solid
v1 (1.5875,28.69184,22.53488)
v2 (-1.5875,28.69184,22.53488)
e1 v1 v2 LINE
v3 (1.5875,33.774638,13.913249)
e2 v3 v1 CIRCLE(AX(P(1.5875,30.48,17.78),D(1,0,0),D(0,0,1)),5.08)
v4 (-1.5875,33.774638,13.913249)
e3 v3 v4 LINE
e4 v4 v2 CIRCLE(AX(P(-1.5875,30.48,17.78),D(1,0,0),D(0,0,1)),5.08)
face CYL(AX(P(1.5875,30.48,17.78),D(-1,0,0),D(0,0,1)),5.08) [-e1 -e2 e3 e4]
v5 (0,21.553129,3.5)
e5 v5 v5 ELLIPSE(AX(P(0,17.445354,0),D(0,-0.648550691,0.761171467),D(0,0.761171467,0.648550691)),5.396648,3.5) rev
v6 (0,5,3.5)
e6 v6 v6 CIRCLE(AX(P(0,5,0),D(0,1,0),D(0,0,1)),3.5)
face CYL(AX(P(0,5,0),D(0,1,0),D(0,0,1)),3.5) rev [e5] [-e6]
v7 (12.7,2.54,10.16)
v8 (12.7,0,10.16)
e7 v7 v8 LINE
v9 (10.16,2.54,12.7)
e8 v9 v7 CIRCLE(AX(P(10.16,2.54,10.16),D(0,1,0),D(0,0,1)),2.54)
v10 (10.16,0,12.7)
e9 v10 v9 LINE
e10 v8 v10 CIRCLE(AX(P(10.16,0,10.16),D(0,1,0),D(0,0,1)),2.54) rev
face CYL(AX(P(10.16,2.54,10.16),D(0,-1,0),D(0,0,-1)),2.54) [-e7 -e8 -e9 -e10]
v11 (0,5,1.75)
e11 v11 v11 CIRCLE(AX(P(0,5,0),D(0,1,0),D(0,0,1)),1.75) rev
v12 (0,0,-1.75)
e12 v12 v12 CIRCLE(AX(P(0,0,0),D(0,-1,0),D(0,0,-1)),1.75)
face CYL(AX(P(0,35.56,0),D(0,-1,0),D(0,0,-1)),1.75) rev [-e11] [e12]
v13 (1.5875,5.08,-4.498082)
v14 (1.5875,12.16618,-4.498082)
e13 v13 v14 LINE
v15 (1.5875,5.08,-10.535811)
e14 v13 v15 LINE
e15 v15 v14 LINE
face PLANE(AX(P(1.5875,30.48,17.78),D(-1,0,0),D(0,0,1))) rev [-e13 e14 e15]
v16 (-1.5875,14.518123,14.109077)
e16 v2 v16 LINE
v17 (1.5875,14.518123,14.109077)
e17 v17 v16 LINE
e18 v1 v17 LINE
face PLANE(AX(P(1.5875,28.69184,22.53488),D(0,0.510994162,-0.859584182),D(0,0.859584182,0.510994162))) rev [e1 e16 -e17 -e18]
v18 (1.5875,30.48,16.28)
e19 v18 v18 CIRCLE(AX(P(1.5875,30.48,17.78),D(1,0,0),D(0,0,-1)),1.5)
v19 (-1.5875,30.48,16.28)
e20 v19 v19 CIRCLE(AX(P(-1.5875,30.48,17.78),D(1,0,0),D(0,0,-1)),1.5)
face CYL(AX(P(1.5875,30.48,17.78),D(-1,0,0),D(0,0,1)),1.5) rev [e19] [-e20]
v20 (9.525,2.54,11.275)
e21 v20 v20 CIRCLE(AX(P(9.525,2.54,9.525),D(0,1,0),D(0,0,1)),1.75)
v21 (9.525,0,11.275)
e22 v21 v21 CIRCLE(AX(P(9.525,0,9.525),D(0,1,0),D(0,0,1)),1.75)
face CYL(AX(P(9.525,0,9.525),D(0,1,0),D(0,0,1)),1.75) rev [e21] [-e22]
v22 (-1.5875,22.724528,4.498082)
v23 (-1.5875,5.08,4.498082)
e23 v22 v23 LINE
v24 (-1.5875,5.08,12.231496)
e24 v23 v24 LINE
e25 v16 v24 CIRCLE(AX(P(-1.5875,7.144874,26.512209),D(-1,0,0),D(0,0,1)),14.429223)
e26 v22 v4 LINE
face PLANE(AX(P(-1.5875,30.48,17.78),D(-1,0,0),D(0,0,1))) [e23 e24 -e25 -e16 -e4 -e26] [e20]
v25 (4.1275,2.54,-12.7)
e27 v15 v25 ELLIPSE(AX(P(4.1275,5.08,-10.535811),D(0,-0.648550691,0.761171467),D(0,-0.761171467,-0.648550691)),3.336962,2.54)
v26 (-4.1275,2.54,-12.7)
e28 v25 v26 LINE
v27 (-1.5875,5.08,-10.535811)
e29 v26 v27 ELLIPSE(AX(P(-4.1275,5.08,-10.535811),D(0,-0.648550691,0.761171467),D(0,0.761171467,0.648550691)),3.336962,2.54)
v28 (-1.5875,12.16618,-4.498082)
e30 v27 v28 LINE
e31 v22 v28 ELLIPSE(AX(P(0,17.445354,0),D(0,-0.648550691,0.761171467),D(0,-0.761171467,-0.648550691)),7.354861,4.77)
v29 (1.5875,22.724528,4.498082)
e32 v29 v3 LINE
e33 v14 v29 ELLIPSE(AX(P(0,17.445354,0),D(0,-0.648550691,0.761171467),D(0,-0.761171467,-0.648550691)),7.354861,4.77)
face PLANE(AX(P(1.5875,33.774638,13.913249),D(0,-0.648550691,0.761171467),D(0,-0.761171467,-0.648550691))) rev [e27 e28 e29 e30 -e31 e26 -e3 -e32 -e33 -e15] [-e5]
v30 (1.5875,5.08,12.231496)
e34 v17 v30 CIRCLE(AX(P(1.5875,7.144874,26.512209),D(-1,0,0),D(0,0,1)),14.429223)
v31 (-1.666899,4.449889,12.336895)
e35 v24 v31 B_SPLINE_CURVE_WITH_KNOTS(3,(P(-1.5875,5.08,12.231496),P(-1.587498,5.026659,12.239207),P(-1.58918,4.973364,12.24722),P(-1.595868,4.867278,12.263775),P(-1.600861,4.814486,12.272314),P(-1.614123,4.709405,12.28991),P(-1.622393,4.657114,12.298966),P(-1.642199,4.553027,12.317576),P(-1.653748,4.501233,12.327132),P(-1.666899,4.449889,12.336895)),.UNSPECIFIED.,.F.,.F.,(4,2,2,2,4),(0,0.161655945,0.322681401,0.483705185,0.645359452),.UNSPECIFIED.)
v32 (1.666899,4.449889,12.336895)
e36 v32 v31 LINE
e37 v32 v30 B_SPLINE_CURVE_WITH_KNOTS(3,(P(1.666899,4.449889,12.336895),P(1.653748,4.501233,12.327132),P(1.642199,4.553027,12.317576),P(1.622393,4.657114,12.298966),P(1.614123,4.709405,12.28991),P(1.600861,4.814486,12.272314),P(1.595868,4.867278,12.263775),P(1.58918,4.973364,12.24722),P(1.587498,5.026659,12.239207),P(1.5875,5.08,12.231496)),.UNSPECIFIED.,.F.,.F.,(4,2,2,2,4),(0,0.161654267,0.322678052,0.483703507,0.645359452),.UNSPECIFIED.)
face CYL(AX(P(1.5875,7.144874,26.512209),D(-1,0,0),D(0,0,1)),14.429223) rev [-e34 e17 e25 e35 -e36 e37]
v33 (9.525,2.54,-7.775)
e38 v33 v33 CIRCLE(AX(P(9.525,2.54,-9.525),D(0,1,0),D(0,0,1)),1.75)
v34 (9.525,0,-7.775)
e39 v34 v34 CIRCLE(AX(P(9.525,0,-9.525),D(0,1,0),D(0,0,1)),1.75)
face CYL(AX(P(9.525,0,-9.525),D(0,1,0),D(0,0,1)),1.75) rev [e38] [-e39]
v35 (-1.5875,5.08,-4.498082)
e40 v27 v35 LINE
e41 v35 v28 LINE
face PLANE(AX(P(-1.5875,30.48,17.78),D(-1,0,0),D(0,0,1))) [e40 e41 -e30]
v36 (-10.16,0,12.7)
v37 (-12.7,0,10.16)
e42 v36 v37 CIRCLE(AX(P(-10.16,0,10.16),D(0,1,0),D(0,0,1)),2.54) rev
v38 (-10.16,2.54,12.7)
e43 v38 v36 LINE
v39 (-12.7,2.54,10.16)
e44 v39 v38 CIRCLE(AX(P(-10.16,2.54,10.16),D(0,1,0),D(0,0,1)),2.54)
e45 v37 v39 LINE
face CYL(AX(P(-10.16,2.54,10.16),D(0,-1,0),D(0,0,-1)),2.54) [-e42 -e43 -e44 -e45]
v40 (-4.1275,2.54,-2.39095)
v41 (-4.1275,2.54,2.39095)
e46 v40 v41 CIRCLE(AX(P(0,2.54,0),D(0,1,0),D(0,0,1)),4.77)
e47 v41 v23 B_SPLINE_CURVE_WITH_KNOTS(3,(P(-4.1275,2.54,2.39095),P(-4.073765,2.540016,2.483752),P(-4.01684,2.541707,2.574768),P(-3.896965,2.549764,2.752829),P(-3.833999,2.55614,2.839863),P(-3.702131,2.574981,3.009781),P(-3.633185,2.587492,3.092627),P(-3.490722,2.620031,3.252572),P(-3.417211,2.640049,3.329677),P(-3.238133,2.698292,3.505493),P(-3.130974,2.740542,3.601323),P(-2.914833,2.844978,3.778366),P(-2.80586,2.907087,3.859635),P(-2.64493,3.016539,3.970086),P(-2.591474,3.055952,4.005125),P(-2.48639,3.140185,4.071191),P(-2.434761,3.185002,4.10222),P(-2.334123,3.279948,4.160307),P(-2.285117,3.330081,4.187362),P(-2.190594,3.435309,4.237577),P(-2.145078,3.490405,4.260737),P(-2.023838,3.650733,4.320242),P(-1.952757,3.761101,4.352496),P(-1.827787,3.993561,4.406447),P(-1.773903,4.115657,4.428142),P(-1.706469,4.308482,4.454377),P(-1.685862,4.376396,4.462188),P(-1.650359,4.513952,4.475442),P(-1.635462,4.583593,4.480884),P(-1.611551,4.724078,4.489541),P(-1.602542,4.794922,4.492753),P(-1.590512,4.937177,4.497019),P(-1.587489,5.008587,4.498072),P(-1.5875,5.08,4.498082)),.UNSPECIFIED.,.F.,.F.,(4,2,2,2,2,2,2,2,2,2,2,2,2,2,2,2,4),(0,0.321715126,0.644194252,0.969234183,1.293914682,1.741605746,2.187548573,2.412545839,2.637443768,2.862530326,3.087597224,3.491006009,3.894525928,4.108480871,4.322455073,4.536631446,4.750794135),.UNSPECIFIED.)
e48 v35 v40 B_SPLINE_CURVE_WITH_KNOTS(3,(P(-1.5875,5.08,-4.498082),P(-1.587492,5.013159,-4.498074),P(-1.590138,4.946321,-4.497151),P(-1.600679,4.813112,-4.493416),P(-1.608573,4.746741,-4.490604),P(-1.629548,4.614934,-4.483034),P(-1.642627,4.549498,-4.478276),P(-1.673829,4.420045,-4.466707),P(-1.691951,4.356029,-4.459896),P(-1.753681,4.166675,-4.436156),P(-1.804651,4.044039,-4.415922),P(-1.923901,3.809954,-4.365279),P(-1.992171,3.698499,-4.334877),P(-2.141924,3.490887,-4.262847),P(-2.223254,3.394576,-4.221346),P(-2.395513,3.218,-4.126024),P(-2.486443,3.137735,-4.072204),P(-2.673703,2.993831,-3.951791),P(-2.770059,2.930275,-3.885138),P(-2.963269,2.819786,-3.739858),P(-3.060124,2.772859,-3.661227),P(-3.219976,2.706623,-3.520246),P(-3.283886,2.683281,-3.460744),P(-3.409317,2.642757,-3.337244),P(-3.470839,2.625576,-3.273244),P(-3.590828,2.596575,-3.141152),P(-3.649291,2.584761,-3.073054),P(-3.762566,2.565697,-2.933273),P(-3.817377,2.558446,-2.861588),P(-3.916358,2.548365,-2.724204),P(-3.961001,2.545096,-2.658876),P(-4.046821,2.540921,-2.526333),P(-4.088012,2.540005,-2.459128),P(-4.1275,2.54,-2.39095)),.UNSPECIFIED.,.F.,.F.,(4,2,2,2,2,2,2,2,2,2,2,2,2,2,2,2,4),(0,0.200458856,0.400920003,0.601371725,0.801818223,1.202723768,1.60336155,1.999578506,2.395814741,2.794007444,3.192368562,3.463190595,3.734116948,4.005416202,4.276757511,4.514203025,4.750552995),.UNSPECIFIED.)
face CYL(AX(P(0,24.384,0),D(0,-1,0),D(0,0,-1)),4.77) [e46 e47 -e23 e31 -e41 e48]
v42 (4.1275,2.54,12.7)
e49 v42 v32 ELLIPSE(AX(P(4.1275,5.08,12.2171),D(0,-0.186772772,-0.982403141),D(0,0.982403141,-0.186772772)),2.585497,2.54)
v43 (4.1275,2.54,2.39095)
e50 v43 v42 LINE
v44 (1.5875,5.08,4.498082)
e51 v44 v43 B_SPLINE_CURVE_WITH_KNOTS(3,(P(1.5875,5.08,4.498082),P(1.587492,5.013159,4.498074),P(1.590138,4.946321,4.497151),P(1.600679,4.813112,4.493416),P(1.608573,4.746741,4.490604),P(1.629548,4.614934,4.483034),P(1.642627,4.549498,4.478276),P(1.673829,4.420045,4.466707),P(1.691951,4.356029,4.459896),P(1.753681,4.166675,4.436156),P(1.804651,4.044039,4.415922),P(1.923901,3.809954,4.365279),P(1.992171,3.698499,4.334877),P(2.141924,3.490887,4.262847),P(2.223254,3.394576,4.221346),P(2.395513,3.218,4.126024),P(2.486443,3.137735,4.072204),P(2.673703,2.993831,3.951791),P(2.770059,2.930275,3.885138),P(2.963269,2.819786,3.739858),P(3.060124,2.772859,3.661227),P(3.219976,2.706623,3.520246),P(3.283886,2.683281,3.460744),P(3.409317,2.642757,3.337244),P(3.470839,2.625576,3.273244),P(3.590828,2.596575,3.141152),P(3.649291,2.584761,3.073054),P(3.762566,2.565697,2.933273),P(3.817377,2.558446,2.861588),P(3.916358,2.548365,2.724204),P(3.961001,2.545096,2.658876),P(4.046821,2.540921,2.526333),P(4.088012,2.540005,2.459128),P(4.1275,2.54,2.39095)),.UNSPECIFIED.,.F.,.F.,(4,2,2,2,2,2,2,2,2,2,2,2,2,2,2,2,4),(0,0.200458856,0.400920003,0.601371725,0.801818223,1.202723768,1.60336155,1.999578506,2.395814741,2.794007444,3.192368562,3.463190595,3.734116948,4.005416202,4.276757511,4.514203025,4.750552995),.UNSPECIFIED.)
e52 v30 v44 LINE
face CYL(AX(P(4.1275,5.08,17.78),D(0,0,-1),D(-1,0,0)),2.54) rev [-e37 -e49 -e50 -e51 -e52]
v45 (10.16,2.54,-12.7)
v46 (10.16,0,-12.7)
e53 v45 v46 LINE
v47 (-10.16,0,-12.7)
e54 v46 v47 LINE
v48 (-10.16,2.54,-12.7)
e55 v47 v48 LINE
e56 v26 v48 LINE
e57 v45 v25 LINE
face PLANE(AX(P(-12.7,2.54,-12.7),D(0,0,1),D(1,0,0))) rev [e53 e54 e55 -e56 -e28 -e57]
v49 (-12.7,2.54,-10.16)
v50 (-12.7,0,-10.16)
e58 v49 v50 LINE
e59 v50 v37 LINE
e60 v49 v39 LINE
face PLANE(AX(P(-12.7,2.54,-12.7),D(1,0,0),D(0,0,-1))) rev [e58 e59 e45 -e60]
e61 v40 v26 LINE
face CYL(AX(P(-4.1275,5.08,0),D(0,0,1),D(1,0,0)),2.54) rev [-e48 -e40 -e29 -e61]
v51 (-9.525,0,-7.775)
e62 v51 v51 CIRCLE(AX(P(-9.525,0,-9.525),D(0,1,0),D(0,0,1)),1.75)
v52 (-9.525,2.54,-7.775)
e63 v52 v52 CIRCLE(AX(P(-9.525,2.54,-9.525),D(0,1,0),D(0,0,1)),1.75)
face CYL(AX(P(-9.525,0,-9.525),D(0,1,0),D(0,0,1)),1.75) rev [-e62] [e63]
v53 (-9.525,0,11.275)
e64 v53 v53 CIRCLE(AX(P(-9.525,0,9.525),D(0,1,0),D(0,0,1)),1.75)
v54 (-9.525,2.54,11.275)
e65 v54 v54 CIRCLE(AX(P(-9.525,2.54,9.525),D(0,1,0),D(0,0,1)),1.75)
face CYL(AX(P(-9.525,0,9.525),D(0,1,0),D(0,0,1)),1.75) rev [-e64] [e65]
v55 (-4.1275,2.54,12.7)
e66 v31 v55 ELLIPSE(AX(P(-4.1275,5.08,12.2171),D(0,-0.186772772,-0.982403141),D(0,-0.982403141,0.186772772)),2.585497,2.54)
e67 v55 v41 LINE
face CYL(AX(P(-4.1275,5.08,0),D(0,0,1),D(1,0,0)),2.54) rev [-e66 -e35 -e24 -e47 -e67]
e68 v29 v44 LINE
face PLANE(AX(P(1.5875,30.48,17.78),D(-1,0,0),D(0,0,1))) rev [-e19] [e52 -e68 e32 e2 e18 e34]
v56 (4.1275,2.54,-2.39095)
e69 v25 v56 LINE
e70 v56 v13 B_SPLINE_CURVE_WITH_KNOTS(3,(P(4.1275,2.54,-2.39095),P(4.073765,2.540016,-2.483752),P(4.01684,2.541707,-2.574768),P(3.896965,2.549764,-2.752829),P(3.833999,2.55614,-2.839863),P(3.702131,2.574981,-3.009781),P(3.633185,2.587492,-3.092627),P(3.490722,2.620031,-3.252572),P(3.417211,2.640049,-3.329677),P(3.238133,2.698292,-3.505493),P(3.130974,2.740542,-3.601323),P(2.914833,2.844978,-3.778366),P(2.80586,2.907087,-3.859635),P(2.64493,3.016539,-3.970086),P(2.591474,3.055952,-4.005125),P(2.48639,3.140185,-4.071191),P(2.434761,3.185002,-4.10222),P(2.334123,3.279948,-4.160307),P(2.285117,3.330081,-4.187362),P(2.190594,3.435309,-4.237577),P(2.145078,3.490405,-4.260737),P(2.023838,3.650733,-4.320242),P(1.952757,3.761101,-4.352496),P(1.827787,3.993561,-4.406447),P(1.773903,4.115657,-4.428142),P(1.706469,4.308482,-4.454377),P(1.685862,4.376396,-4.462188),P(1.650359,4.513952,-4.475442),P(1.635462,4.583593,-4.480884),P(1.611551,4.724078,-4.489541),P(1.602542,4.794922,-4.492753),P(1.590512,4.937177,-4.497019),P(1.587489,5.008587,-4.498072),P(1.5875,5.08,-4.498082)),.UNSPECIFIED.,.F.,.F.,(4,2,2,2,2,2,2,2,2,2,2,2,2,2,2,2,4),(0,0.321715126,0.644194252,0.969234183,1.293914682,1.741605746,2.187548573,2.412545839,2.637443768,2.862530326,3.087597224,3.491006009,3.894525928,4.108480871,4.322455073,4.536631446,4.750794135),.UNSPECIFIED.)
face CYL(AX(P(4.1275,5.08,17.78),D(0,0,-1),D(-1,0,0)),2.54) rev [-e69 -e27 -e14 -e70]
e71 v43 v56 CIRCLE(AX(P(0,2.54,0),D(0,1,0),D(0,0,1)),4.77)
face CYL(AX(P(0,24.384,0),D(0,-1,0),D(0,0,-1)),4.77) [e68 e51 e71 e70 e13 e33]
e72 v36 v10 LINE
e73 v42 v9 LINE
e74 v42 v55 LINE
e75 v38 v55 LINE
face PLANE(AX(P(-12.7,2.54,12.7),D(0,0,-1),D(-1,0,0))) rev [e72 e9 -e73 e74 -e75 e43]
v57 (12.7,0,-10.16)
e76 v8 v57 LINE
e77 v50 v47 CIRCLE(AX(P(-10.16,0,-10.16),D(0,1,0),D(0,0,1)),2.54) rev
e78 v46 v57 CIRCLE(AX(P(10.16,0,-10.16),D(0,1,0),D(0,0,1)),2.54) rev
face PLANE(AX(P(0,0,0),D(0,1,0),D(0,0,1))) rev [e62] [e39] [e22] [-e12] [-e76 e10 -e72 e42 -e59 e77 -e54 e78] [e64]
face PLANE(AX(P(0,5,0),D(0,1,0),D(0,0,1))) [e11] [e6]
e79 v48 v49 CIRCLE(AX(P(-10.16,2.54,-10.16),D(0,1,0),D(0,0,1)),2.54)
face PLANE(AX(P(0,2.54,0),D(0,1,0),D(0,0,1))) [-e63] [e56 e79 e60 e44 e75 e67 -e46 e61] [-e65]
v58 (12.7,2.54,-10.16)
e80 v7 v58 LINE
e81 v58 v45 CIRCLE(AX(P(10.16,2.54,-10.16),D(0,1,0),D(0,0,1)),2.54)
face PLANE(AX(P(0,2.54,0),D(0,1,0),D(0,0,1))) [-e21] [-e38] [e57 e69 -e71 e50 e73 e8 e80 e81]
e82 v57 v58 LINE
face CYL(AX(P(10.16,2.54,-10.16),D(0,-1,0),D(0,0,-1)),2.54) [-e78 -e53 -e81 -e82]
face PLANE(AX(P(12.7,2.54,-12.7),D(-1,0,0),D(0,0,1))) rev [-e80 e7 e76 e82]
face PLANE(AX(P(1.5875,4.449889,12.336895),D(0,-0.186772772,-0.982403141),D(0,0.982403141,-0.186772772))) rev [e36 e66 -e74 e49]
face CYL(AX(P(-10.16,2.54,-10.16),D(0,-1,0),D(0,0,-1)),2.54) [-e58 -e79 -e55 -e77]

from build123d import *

# Parameters (mm, degrees)
BOSS_EXTRUDE1_DEPTH     = 2.54
SKETCH3_R               = 1.5000000000000009
BOSS_EXTRUDE2_DEPTH     = 1.5875
FILLET1_START           = -12.7000001
FILLET1_DEPTH           = 25.4000001
FILLET1_START_2         = -5
FILLET1_2_DEPTH         = 10
FILLET2_R               = 2.54
SKETCH4_R               = 3.5
BOSS_EXTRUDE3_DEPTH     = 7
SKETCH5_R               = 1.75
CUT_EXTRUDE1_DEPTH      = 45.14049388033623
CUT_EXTRUDE2_DEPTH      = 39.723935750385714
CUT_EXTRUDE2_DEPTH_BACK = 2
SKETCH6_R               = 3.5
SKETCH10_R              = 4.77
SKETCH10_R_2            = 3.5
BOSS_EXTRUDE4_DEPTH     = 21.844000000000005
SKETCH9_R               = 1.7499999999999998
CUT_EXTRUDE4_DEPTH      = 43.12113483751359
CUT_EXTRUDE5_DEPTH      = 45.62315381335121
CUT_EXTRUDE5_DEPTH_BACK = 45.62315381335121


with BuildPart() as part:
    # Sketch1 → Boss-Extrude1 (new body)
    with BuildSketch(Plane(origin=(0, 0, 0), x_dir=(1, 0, 0), z_dir=(0, 1, 0))):
        Polygon((-12.7, 12.699999999999998), (12.7, 12.699999999999998), (12.700000000000003, -12.700000000000001), (-12.699999999999996, -12.700000000000001), align=None)
    extrude(amount=BOSS_EXTRUDE1_DEPTH)

    # Sketch3 → Boss-Extrude2 (add, symmetric)
    with BuildSketch(Plane(origin=(0, 0, 0), x_dir=(0, 0, -1), z_dir=(1, 0, 0))):
        with BuildLine():
            Line((-22.53488, 28.691839999999996), (-14.109077453558108, 14.51812311143032))
            ThreePointArc((-14.109077453558108, 14.51812311143032), (-12.3014463794853, 9.646212675108597), (-12.336895325054973, 4.449888515498061))
            Line((-12.336895325054973, 4.449888515498061), (-12.700000000000001, 2.54))
            Line((-12.700000000000001, 2.54), (12.699999999999998, 2.54))
            Line((12.699999999999998, 2.54), (-13.91324894993197, 33.77463750916512))
            ThreePointArc((-13.91324894993197, 33.77463750916512), (-20.3599032710008, 34.856128324475804), (-22.53488, 28.691839999999996))
        make_face()
        with Locations((-17.779999999999998, 30.479999999999997)):
            Circle(SKETCH3_R, mode=Mode.SUBTRACT)
    extrude(amount=BOSS_EXTRUDE2_DEPTH, both=True)

    # Fillet1: read off the stored shape, not the designer's step
    # Fillet1 outline → Fillet1 (add)
    with BuildSketch(Plane.XY.offset(FILLET1_START)):
        with BuildLine():
            ThreePointArc((-1.5875, 5.08), (-2.331448776, 3.283948776), (-4.1275, 2.54))
            Line((-4.1275, 2.54), (-1.5875, 2.54))
            Line((-1.5875, 2.54), (-1.5875, 5.08))
        make_face()
        with BuildLine():
            Line((1.5875, 2.54), (4.1275, 2.54))
            ThreePointArc((4.1275, 2.54), (2.331448776, 3.283948776), (1.5875, 5.08))
            Line((1.5875, 5.08), (1.5875, 2.54))
        make_face()
    extrude(amount=FILLET1_DEPTH)

    # Fillet1 2 outline → Fillet1 2 (cut)
    with BuildSketch(Plane.YZ.offset(FILLET1_START_2)):
        Polygon((5.08, -10.535811211), (2.54, -12.7), (5.08, -12.7000001), align=None)
        with BuildLine():
            Line((5.08, 12.7), (2.54, 12.7))
            Line((2.54, 12.7), (4.449888515, 12.336895325))
            ThreePointArc((4.449888515, 12.336895325), (4.764360857, 12.280707955), (5.08, 12.231496116))
            Line((5.08, 12.231496116), (5.08, 12.7))
        make_face()
    extrude(amount=FILLET1_2_DEPTH, mode=Mode.SUBTRACT)

    # Fillet2
    fillet2_edges = [part.edges().sort_by_distance(p)[0] for p in [
        (12.7, 1.27, -12.699999999999998),
        (12.700000000000003, 1.27, 12.700000000000001),
        (-12.699999999999996, 1.27, 12.700000000000001),
        (-12.7, 1.27, -12.699999999999998),
    ]]
    fillet(fillet2_edges, radius=FILLET2_R)

    # Sketch4 → Boss-Extrude3 (add)
    with BuildSketch(Plane.XZ):
        Circle(SKETCH4_R)
    extrude(amount=-BOSS_EXTRUDE3_DEPTH)

    # Sketch5 → Cut-Extrude1 (cut, through all)
    with BuildSketch(Plane.XZ):
        with Locations(Location((0, 0, 0), (0, 0, 270))):
            Circle(SKETCH5_R)
    extrude(amount=-CUT_EXTRUDE1_DEPTH, mode=Mode.SUBTRACT)

    # Sketch6 → Cut-Extrude2 (cut, two sides: drawn at the far end of the back side and taken through both)
    with BuildSketch(Plane(origin=(0, 7, 0), x_dir=(1, 0, 0), z_dir=(0, 1, 0)).offset(-CUT_EXTRUDE2_DEPTH_BACK)):
        Circle(SKETCH6_R)
    extrude(amount=CUT_EXTRUDE2_DEPTH + CUT_EXTRUDE2_DEPTH_BACK, mode=Mode.SUBTRACT)

    # Sketch10 → Boss-Extrude4 (add)
    with BuildSketch(Plane(origin=(0, 2.54, 0), x_dir=(1, 0, 0), z_dir=(0, 1, 0))):
        with Locations(Location((0, 0, 0), (0, 0, 70.560627051))):
            Circle(SKETCH10_R)
        with Locations(Location((0, 0, 0), (0, 0, 270))):
            Circle(SKETCH10_R_2, mode=Mode.SUBTRACT)
    extrude(amount=BOSS_EXTRUDE4_DEPTH)

    # Sketch9 → Cut-Extrude4 (cut, through all)
    with BuildSketch(Plane(origin=(0, 2.54, 0), x_dir=(1, 0, 0), z_dir=(0, 1, 0))):
        with Locations(Location((-9.524999999999999, -9.525000000000002, 0), (0, 0, 270))):
            Circle(SKETCH9_R)
        with Locations(Location((-9.524999999999999, 9.524999999999999, 0), (0, 0, 270))):
            Circle(SKETCH9_R)
        with Locations(Location((9.525000000000002, 9.525000000000002, 0), (0, 0, 270))):
            Circle(SKETCH9_R)
        with Locations(Location((9.525000000000002, -9.524999999999999, 0), (0, 0, 270))):
            Circle(SKETCH9_R)
    extrude(amount=-CUT_EXTRUDE4_DEPTH, mode=Mode.SUBTRACT)

    # Sketch8 → Cut-Extrude5 (cut, two sides: drawn at the far end of the back side and taken through both)
    with BuildSketch(Plane(origin=(1.5875, 0, 0), x_dir=(0, 0, -1), z_dir=(1, 0, 0)).offset(-CUT_EXTRUDE5_DEPTH_BACK)):
        Polygon((-9.955433984779507, 29.129548290728966), (6.7091639016479245, 9.571144309395804), (6.709163901647932, 29.129548290728973), align=None)
    extrude(amount=CUT_EXTRUDE5_DEPTH + CUT_EXTRUDE5_DEPTH_BACK, mode=Mode.SUBTRACT)


solid = part.part
